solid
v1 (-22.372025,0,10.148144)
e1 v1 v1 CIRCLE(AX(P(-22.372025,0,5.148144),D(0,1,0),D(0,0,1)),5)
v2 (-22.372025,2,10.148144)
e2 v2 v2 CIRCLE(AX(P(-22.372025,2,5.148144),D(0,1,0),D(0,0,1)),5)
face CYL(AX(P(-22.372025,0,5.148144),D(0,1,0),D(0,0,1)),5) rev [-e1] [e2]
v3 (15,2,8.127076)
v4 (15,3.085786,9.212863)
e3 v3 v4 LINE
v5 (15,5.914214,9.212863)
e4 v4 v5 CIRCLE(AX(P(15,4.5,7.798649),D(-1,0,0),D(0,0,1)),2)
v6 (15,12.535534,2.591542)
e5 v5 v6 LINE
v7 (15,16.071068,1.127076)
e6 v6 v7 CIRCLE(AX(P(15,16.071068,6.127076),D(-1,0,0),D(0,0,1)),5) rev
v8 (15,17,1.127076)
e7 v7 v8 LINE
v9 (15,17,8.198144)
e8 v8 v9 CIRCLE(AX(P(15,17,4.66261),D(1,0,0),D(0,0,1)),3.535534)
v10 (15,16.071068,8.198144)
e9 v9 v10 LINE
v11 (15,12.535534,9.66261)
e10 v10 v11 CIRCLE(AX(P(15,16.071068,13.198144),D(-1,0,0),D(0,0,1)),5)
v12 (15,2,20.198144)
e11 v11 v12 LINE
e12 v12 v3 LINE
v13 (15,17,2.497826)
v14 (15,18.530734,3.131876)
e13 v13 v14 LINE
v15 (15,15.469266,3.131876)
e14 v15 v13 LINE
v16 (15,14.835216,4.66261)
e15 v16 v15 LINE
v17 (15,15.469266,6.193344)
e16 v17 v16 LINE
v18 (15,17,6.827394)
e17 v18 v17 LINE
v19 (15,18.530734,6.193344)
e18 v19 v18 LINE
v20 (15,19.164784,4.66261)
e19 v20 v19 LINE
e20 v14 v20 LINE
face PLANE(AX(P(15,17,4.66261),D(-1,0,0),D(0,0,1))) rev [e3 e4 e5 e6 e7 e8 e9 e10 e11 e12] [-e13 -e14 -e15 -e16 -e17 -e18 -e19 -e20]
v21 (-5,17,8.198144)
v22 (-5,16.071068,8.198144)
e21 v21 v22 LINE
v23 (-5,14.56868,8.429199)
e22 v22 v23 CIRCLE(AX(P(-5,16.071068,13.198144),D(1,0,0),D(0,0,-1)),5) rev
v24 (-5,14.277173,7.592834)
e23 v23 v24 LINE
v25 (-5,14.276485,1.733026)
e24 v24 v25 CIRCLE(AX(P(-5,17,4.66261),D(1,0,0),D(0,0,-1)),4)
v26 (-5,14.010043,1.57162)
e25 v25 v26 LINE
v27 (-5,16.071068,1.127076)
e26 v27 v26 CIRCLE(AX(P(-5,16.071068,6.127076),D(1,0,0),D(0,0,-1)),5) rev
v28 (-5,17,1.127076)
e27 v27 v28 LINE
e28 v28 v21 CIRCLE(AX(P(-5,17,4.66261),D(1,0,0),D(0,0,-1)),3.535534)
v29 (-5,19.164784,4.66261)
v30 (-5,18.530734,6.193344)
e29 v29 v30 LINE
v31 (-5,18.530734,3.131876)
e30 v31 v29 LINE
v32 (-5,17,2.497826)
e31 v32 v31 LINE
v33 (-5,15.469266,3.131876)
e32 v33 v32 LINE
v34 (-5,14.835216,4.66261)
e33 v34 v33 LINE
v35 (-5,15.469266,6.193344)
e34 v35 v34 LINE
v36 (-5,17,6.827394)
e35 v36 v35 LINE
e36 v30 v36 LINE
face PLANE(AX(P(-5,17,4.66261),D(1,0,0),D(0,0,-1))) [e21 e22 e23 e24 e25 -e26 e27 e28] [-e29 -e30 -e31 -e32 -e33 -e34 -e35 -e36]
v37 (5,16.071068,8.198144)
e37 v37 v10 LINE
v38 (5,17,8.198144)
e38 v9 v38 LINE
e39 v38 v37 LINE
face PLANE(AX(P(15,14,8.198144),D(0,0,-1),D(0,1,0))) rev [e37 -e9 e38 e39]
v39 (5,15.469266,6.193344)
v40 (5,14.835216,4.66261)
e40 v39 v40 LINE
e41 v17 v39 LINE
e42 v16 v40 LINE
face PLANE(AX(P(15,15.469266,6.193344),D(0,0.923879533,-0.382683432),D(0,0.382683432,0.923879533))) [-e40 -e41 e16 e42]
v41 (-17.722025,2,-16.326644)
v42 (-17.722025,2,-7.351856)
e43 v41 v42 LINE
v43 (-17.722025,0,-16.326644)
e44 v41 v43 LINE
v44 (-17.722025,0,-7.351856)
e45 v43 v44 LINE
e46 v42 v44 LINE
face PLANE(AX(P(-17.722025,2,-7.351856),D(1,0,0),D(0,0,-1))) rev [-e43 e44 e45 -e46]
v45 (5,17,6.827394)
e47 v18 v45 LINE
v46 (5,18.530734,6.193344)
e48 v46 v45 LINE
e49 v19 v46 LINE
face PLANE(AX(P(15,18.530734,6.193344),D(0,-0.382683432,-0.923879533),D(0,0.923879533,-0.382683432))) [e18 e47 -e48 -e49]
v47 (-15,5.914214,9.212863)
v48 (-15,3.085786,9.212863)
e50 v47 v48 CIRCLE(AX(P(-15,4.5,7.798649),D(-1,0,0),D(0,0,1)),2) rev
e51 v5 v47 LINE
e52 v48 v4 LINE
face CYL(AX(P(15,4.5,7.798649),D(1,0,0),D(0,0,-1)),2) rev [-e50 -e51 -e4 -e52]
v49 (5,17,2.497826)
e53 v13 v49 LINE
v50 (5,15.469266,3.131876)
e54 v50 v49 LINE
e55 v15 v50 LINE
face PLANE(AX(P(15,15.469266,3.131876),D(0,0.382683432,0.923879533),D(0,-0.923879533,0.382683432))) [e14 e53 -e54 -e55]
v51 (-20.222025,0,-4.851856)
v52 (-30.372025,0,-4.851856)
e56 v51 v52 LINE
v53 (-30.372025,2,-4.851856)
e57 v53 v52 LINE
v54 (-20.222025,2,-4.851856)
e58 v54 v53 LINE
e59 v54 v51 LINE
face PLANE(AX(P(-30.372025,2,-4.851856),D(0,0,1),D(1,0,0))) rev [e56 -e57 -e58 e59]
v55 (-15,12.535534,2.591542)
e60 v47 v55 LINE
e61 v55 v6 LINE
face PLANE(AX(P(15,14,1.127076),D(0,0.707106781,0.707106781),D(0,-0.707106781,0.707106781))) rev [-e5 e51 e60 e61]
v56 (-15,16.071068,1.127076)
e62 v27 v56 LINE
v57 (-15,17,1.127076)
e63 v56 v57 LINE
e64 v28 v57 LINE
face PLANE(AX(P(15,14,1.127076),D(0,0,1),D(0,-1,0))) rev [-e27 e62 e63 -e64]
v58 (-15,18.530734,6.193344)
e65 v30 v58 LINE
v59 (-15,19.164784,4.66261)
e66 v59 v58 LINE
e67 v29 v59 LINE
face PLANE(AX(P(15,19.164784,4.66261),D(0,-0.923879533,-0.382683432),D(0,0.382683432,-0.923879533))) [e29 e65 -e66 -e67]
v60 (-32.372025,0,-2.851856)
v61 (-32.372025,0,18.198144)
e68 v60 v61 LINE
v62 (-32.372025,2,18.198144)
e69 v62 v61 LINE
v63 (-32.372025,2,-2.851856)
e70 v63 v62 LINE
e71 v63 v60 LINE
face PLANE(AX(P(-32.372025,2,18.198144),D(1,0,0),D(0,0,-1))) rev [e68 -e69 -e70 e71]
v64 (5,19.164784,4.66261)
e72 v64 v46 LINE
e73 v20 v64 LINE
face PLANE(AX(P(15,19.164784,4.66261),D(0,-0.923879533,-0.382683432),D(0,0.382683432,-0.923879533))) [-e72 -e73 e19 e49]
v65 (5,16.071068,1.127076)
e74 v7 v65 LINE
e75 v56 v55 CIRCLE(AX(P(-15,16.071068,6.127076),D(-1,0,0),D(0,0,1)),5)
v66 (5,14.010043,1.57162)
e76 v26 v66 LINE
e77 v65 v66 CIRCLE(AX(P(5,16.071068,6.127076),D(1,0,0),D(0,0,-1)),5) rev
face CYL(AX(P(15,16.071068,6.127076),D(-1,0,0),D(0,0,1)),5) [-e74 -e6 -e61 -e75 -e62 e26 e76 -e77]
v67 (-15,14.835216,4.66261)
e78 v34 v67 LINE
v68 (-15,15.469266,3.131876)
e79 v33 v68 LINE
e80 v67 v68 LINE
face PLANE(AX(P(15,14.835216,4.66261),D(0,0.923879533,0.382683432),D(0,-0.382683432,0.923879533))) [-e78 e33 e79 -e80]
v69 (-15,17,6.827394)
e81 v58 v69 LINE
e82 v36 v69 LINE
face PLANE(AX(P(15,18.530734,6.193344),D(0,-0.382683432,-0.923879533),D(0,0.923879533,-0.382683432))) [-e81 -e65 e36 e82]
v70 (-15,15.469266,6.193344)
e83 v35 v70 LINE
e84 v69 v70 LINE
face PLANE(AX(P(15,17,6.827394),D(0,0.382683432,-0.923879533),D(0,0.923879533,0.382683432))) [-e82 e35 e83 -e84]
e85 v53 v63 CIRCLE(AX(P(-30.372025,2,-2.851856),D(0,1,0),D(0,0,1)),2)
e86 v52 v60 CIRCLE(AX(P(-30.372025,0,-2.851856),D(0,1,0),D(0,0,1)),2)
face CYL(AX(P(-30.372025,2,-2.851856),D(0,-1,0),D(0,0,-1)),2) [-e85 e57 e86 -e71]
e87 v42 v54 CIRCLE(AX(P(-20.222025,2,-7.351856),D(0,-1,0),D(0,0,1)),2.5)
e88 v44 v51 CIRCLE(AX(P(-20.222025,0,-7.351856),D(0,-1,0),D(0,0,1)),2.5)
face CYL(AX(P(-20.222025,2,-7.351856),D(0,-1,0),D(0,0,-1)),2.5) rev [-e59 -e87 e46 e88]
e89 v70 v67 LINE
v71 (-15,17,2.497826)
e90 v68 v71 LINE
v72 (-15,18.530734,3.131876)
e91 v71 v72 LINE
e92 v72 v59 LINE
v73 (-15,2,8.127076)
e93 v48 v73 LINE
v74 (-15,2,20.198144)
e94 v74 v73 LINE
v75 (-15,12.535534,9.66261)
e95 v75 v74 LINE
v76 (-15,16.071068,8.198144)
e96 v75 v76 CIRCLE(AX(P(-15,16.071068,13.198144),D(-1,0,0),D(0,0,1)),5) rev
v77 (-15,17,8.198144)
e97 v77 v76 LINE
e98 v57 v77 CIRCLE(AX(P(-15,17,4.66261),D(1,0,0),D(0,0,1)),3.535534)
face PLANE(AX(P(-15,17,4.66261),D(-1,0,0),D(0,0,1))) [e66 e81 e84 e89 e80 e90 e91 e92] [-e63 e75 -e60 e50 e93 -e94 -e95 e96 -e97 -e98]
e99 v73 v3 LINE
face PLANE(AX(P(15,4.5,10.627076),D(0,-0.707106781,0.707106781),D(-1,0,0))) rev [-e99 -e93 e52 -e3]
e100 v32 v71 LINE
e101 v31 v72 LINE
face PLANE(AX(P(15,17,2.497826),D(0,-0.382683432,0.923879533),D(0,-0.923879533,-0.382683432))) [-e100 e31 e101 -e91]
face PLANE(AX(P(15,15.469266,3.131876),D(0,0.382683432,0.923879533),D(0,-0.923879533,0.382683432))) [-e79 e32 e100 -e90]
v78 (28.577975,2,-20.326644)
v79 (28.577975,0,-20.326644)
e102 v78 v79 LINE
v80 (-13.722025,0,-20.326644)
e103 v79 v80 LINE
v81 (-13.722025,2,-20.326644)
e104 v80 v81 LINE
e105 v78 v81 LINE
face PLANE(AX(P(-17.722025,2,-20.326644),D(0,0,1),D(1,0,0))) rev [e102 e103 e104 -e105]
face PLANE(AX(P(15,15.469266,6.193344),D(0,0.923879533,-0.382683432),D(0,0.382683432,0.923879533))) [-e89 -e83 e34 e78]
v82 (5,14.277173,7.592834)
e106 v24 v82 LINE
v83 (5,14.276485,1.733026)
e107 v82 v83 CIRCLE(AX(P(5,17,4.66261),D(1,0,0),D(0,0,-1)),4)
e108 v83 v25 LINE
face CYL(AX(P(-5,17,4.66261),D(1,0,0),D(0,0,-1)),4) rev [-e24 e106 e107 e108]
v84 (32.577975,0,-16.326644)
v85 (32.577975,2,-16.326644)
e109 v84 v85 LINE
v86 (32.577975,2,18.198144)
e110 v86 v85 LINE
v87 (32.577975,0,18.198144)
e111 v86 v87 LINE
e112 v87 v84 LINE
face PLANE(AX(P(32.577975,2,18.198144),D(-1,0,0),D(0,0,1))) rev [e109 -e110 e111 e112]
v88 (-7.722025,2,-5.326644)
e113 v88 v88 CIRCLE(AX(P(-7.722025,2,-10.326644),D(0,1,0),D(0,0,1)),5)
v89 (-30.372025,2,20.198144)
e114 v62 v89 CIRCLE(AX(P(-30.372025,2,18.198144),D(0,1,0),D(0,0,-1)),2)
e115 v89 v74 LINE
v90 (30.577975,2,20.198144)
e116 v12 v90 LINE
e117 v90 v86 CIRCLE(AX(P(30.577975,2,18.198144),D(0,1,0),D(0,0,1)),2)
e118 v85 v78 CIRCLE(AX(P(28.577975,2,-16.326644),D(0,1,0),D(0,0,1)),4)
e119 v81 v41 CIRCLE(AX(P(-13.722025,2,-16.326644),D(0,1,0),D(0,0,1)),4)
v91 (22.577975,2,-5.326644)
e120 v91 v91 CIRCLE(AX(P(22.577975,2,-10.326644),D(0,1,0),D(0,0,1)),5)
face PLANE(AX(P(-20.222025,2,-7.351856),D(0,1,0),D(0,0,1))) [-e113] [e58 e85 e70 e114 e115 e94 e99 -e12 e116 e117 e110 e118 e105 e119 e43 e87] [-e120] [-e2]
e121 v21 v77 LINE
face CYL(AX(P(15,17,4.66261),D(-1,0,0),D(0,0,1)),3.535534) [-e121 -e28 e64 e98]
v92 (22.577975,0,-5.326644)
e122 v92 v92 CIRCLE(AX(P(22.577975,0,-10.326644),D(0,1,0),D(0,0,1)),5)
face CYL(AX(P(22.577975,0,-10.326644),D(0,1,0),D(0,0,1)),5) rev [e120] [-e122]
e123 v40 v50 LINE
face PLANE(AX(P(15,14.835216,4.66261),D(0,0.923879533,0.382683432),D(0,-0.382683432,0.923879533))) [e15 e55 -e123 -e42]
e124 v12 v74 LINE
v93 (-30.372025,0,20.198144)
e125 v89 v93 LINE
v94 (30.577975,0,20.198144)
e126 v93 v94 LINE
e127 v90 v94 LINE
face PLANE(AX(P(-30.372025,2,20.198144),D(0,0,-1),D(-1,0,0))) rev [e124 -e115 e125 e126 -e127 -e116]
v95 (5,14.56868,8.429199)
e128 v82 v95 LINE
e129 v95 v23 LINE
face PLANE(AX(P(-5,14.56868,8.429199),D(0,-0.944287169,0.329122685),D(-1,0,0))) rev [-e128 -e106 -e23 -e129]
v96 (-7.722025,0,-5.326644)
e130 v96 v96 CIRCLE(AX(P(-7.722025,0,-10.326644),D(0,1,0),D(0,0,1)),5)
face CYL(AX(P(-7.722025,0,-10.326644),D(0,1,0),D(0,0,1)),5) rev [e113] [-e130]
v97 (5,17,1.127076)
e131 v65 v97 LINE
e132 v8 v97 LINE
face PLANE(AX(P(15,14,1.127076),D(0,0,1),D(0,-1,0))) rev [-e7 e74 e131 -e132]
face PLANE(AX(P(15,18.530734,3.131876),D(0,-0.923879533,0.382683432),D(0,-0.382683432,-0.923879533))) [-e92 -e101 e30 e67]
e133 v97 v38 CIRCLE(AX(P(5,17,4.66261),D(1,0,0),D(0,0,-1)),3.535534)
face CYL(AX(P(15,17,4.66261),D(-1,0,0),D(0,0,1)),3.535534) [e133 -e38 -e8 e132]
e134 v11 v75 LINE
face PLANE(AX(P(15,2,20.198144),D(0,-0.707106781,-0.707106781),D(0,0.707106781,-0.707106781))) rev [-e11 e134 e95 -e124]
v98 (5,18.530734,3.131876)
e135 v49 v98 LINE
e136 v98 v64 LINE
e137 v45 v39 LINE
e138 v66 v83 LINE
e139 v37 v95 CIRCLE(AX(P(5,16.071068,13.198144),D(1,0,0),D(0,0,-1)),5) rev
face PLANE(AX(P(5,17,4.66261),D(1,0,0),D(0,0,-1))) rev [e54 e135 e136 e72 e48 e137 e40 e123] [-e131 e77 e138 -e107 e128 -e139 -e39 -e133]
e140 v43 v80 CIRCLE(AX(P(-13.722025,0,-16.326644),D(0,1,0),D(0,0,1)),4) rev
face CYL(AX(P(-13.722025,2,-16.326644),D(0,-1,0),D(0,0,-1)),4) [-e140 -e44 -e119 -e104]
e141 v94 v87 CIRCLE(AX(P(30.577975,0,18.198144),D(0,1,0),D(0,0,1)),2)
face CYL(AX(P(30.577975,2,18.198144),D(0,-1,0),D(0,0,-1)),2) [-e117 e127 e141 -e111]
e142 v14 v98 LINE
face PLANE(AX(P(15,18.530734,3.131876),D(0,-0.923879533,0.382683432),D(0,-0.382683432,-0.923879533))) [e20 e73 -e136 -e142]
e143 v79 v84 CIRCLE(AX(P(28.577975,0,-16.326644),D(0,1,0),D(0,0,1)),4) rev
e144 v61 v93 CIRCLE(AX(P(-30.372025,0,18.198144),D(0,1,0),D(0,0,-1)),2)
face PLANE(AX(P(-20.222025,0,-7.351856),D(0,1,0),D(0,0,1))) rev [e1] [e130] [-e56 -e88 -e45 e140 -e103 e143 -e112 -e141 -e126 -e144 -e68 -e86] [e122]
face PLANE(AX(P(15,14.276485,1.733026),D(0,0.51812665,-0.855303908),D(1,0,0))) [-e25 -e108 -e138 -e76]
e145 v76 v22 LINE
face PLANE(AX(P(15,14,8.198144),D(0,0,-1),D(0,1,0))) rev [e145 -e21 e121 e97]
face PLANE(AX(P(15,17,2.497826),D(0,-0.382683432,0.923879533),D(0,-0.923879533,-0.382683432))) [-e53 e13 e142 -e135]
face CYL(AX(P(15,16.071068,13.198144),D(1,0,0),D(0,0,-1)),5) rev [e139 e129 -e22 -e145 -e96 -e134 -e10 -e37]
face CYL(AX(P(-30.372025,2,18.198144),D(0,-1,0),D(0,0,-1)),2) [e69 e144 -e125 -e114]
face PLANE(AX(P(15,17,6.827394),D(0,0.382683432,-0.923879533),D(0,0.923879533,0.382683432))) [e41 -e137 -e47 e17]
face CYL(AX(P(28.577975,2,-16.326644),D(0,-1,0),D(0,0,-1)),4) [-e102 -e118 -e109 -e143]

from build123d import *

# Parameters (mm, degrees)
BOSS_EXTRUDE2_DEPTH = 2
BOSS_EXTRUDE3_DEPTH = 15
CHAMFER1_SIZE       = 5
CHAMFER1_SIZE2      = 3.535533906
FILLET2_R           = 5
FILLET3_R           = 2
SKETCH6_R           = 5
CUT_EXTRUDE5_DEPTH  = 43.63874873
FILLET4_R           = 4
SKETCH4_R           = 4
CUT_EXTRUDE6_DEPTH  = 5


with BuildPart() as part:
    # Sketch1 → Boss-Extrude2 (new body)
    with BuildSketch(Plane(origin=(0, 0, 0), x_dir=(1, 0, 0), z_dir=(0, 1, 0))):
        with BuildLine():
            Line((-30.372025328, 4.851856012), (-20.222025328, 4.851856012))
            ThreePointArc((-20.222025328, 4.851856012), (-18.454258375, 5.584089059), (-17.722025328, 7.351856012))
            Line((-17.722025328, 7.351856012), (-17.722025328, 20.326643656))
            Line((-17.722025328, 20.326643656), (32.577974672, 20.326643656))
            Line((32.577974672, 20.326643656), (32.577974672, -18.198143988))
            ThreePointArc((32.577974672, -18.198143988), (31.992188234, -19.612357551), (30.577974672, -20.198143988))
            Line((30.577974672, -20.198143988), (-30.372025328, -20.198143988))
            ThreePointArc((-30.372025328, -20.198143988), (-31.78623889, -19.612357551), (-32.372025328, -18.198143988))
            Line((-32.372025328, -18.198143988), (-32.372025328, 2.851856012))
            ThreePointArc((-32.372025328, 2.851856012), (-31.78623889, 4.266069574), (-30.372025328, 4.851856012))
        make_face()
    extrude(amount=BOSS_EXTRUDE2_DEPTH)

    # Sketch2 → Boss-Extrude3 (add, symmetric)
    with BuildSketch(Plane(origin=(0, 0, 0), x_dir=(0, 0, -1), z_dir=(1, 0, 0))):
        with BuildLine():
            Line((-20.198143988, 2), (-8.198143988, 14))
            Line((-8.198143988, 14), (-8.198143988, 17))
            ThreePointArc((-8.198143988, 17), (-4.662610082, 20.535533906), (-1.127076177, 17))
            Line((-1.127076177, 17), (-1.127076177, 14))
            Line((-1.127076177, 14), (-13.127076177, 2))
            Line((-13.127076177, 2), (-20.198143988, 2))
        make_face()
        Polygon((-4.662610082, 14.835215599), (-3.131876353, 15.469266271), (-2.497825682, 17), (-3.131876353, 18.530733729), (-4.662610082, 19.164784401), (-6.193343812, 18.530733729), (-6.827394483, 17), (-6.193343812, 15.469266271), align=None, mode=Mode.SUBTRACT)
    extrude(amount=BOSS_EXTRUDE3_DEPTH, both=True)

    # Chamfer1
    chamfer1_edges = [part.edges().sort_by_distance(p)[0] for p in [
        (0, 2, 13.127076177),
    ]]
    chamfer1_side = [part.faces().sort_by_distance(p)[0] for p in [
        (2.715334419, 2, -0.404703372),
    ]]
    chamfer(chamfer1_edges, length=CHAMFER1_SIZE, length2=CHAMFER1_SIZE2, reference=chamfer1_side[0])

    # Fillet2
    fillet2_edges = [part.edges().sort_by_distance(p)[0] for p in [
        (0, 14, 1.127076177),
        (0, 14, 8.198143988),
    ]]
    fillet(fillet2_edges, radius=FILLET2_R)

    # Fillet3
    fillet3_edges = [part.edges().sort_by_distance(p)[0] for p in [
        (0, 4.5, 10.627076177),
    ]]
    fillet(fillet3_edges, radius=FILLET3_R)

    # Sketch6 → Cut-Extrude5 (cut, through all)
    with BuildSketch(Plane(origin=(0, 2, 0), x_dir=(1, 0, 0), z_dir=(0, 1, 0))):
        with Locations(Location((22.577974672, 10.326643656, 0), (0, 0, 270))):
            Circle(SKETCH6_R)
        with Locations(Location((-7.722025328, 10.326643656, 0), (0, 0, 270))):
            Circle(SKETCH6_R)
        with Locations(Location((-22.372025328, -5.148143988, 0), (0, 0, 270))):
            Circle(SKETCH6_R)
    extrude(amount=-CUT_EXTRUDE5_DEPTH, mode=Mode.SUBTRACT)

    # Fillet4
    fillet4_edges = [part.edges().sort_by_distance(p)[0] for p in [
        (-17.722025328, 1, -20.326643656),
        (32.577974672, 1, -20.326643656),
    ]]
    fillet(fillet4_edges, radius=FILLET4_R)

    # Sketch4 → Cut-Extrude6 (cut, symmetric)
    with BuildSketch(Plane(origin=(0, 0, 0), x_dir=(0, 0, -1), z_dir=(1, 0, 0))):
        with Locations((-4.662610082, 17)):
            Circle(SKETCH4_R)
    extrude(amount=CUT_EXTRUDE6_DEPTH, both=True, mode=Mode.SUBTRACT)

    # Chamfer2
    # the kernel refuses this chamfer: 1, 0.7919938 mm, written as the material it takes off along each edge
    with BuildSketch(Plane(origin=(-5, 14.878966184, 1.271265873), x_dir=(0, -0.9451293826533955, 0.3266962657350272), z_dir=(1, 0, 0))) as chamfer2_piece_1:
        with BuildLine():
            Line((0.919369635, 0), (0.720278223, -0.239594389))
            ThreePointArc((0.720278223, -0.239594389), (0.358867912, -0.100362012), (0, 0))
            ThreePointArc((0, 0), (0.472481659, 0.021159479), (0.919369635, 0))
        make_face()
    extrude(amount=10, mode=Mode.SUBTRACT)

    # Chamfer3
    # the kernel refuses this chamfer: 1, 0.717753161 mm, written as the material it takes off along each edge
    with BuildSketch(Plane(origin=(5, 15.260052087, 8.264357056), x_dir=(0, -0.8256881187536859, -0.5641268745140575), z_dir=(-1, 0, 0))) as chamfer3_piece_1:
        with BuildLine():
            Line((1.190375888, 0), (0.477865365, 0.526129749))
            ThreePointArc((0.477865365, 0.526129749), (0.246923946, 0.253056093), (0, 0))
            ThreePointArc((0, 0), (0.611506956, 0.044495651), (1.190375888, 0))
        make_face()
    extrude(amount=10, mode=Mode.SUBTRACT)


solid = part.part
